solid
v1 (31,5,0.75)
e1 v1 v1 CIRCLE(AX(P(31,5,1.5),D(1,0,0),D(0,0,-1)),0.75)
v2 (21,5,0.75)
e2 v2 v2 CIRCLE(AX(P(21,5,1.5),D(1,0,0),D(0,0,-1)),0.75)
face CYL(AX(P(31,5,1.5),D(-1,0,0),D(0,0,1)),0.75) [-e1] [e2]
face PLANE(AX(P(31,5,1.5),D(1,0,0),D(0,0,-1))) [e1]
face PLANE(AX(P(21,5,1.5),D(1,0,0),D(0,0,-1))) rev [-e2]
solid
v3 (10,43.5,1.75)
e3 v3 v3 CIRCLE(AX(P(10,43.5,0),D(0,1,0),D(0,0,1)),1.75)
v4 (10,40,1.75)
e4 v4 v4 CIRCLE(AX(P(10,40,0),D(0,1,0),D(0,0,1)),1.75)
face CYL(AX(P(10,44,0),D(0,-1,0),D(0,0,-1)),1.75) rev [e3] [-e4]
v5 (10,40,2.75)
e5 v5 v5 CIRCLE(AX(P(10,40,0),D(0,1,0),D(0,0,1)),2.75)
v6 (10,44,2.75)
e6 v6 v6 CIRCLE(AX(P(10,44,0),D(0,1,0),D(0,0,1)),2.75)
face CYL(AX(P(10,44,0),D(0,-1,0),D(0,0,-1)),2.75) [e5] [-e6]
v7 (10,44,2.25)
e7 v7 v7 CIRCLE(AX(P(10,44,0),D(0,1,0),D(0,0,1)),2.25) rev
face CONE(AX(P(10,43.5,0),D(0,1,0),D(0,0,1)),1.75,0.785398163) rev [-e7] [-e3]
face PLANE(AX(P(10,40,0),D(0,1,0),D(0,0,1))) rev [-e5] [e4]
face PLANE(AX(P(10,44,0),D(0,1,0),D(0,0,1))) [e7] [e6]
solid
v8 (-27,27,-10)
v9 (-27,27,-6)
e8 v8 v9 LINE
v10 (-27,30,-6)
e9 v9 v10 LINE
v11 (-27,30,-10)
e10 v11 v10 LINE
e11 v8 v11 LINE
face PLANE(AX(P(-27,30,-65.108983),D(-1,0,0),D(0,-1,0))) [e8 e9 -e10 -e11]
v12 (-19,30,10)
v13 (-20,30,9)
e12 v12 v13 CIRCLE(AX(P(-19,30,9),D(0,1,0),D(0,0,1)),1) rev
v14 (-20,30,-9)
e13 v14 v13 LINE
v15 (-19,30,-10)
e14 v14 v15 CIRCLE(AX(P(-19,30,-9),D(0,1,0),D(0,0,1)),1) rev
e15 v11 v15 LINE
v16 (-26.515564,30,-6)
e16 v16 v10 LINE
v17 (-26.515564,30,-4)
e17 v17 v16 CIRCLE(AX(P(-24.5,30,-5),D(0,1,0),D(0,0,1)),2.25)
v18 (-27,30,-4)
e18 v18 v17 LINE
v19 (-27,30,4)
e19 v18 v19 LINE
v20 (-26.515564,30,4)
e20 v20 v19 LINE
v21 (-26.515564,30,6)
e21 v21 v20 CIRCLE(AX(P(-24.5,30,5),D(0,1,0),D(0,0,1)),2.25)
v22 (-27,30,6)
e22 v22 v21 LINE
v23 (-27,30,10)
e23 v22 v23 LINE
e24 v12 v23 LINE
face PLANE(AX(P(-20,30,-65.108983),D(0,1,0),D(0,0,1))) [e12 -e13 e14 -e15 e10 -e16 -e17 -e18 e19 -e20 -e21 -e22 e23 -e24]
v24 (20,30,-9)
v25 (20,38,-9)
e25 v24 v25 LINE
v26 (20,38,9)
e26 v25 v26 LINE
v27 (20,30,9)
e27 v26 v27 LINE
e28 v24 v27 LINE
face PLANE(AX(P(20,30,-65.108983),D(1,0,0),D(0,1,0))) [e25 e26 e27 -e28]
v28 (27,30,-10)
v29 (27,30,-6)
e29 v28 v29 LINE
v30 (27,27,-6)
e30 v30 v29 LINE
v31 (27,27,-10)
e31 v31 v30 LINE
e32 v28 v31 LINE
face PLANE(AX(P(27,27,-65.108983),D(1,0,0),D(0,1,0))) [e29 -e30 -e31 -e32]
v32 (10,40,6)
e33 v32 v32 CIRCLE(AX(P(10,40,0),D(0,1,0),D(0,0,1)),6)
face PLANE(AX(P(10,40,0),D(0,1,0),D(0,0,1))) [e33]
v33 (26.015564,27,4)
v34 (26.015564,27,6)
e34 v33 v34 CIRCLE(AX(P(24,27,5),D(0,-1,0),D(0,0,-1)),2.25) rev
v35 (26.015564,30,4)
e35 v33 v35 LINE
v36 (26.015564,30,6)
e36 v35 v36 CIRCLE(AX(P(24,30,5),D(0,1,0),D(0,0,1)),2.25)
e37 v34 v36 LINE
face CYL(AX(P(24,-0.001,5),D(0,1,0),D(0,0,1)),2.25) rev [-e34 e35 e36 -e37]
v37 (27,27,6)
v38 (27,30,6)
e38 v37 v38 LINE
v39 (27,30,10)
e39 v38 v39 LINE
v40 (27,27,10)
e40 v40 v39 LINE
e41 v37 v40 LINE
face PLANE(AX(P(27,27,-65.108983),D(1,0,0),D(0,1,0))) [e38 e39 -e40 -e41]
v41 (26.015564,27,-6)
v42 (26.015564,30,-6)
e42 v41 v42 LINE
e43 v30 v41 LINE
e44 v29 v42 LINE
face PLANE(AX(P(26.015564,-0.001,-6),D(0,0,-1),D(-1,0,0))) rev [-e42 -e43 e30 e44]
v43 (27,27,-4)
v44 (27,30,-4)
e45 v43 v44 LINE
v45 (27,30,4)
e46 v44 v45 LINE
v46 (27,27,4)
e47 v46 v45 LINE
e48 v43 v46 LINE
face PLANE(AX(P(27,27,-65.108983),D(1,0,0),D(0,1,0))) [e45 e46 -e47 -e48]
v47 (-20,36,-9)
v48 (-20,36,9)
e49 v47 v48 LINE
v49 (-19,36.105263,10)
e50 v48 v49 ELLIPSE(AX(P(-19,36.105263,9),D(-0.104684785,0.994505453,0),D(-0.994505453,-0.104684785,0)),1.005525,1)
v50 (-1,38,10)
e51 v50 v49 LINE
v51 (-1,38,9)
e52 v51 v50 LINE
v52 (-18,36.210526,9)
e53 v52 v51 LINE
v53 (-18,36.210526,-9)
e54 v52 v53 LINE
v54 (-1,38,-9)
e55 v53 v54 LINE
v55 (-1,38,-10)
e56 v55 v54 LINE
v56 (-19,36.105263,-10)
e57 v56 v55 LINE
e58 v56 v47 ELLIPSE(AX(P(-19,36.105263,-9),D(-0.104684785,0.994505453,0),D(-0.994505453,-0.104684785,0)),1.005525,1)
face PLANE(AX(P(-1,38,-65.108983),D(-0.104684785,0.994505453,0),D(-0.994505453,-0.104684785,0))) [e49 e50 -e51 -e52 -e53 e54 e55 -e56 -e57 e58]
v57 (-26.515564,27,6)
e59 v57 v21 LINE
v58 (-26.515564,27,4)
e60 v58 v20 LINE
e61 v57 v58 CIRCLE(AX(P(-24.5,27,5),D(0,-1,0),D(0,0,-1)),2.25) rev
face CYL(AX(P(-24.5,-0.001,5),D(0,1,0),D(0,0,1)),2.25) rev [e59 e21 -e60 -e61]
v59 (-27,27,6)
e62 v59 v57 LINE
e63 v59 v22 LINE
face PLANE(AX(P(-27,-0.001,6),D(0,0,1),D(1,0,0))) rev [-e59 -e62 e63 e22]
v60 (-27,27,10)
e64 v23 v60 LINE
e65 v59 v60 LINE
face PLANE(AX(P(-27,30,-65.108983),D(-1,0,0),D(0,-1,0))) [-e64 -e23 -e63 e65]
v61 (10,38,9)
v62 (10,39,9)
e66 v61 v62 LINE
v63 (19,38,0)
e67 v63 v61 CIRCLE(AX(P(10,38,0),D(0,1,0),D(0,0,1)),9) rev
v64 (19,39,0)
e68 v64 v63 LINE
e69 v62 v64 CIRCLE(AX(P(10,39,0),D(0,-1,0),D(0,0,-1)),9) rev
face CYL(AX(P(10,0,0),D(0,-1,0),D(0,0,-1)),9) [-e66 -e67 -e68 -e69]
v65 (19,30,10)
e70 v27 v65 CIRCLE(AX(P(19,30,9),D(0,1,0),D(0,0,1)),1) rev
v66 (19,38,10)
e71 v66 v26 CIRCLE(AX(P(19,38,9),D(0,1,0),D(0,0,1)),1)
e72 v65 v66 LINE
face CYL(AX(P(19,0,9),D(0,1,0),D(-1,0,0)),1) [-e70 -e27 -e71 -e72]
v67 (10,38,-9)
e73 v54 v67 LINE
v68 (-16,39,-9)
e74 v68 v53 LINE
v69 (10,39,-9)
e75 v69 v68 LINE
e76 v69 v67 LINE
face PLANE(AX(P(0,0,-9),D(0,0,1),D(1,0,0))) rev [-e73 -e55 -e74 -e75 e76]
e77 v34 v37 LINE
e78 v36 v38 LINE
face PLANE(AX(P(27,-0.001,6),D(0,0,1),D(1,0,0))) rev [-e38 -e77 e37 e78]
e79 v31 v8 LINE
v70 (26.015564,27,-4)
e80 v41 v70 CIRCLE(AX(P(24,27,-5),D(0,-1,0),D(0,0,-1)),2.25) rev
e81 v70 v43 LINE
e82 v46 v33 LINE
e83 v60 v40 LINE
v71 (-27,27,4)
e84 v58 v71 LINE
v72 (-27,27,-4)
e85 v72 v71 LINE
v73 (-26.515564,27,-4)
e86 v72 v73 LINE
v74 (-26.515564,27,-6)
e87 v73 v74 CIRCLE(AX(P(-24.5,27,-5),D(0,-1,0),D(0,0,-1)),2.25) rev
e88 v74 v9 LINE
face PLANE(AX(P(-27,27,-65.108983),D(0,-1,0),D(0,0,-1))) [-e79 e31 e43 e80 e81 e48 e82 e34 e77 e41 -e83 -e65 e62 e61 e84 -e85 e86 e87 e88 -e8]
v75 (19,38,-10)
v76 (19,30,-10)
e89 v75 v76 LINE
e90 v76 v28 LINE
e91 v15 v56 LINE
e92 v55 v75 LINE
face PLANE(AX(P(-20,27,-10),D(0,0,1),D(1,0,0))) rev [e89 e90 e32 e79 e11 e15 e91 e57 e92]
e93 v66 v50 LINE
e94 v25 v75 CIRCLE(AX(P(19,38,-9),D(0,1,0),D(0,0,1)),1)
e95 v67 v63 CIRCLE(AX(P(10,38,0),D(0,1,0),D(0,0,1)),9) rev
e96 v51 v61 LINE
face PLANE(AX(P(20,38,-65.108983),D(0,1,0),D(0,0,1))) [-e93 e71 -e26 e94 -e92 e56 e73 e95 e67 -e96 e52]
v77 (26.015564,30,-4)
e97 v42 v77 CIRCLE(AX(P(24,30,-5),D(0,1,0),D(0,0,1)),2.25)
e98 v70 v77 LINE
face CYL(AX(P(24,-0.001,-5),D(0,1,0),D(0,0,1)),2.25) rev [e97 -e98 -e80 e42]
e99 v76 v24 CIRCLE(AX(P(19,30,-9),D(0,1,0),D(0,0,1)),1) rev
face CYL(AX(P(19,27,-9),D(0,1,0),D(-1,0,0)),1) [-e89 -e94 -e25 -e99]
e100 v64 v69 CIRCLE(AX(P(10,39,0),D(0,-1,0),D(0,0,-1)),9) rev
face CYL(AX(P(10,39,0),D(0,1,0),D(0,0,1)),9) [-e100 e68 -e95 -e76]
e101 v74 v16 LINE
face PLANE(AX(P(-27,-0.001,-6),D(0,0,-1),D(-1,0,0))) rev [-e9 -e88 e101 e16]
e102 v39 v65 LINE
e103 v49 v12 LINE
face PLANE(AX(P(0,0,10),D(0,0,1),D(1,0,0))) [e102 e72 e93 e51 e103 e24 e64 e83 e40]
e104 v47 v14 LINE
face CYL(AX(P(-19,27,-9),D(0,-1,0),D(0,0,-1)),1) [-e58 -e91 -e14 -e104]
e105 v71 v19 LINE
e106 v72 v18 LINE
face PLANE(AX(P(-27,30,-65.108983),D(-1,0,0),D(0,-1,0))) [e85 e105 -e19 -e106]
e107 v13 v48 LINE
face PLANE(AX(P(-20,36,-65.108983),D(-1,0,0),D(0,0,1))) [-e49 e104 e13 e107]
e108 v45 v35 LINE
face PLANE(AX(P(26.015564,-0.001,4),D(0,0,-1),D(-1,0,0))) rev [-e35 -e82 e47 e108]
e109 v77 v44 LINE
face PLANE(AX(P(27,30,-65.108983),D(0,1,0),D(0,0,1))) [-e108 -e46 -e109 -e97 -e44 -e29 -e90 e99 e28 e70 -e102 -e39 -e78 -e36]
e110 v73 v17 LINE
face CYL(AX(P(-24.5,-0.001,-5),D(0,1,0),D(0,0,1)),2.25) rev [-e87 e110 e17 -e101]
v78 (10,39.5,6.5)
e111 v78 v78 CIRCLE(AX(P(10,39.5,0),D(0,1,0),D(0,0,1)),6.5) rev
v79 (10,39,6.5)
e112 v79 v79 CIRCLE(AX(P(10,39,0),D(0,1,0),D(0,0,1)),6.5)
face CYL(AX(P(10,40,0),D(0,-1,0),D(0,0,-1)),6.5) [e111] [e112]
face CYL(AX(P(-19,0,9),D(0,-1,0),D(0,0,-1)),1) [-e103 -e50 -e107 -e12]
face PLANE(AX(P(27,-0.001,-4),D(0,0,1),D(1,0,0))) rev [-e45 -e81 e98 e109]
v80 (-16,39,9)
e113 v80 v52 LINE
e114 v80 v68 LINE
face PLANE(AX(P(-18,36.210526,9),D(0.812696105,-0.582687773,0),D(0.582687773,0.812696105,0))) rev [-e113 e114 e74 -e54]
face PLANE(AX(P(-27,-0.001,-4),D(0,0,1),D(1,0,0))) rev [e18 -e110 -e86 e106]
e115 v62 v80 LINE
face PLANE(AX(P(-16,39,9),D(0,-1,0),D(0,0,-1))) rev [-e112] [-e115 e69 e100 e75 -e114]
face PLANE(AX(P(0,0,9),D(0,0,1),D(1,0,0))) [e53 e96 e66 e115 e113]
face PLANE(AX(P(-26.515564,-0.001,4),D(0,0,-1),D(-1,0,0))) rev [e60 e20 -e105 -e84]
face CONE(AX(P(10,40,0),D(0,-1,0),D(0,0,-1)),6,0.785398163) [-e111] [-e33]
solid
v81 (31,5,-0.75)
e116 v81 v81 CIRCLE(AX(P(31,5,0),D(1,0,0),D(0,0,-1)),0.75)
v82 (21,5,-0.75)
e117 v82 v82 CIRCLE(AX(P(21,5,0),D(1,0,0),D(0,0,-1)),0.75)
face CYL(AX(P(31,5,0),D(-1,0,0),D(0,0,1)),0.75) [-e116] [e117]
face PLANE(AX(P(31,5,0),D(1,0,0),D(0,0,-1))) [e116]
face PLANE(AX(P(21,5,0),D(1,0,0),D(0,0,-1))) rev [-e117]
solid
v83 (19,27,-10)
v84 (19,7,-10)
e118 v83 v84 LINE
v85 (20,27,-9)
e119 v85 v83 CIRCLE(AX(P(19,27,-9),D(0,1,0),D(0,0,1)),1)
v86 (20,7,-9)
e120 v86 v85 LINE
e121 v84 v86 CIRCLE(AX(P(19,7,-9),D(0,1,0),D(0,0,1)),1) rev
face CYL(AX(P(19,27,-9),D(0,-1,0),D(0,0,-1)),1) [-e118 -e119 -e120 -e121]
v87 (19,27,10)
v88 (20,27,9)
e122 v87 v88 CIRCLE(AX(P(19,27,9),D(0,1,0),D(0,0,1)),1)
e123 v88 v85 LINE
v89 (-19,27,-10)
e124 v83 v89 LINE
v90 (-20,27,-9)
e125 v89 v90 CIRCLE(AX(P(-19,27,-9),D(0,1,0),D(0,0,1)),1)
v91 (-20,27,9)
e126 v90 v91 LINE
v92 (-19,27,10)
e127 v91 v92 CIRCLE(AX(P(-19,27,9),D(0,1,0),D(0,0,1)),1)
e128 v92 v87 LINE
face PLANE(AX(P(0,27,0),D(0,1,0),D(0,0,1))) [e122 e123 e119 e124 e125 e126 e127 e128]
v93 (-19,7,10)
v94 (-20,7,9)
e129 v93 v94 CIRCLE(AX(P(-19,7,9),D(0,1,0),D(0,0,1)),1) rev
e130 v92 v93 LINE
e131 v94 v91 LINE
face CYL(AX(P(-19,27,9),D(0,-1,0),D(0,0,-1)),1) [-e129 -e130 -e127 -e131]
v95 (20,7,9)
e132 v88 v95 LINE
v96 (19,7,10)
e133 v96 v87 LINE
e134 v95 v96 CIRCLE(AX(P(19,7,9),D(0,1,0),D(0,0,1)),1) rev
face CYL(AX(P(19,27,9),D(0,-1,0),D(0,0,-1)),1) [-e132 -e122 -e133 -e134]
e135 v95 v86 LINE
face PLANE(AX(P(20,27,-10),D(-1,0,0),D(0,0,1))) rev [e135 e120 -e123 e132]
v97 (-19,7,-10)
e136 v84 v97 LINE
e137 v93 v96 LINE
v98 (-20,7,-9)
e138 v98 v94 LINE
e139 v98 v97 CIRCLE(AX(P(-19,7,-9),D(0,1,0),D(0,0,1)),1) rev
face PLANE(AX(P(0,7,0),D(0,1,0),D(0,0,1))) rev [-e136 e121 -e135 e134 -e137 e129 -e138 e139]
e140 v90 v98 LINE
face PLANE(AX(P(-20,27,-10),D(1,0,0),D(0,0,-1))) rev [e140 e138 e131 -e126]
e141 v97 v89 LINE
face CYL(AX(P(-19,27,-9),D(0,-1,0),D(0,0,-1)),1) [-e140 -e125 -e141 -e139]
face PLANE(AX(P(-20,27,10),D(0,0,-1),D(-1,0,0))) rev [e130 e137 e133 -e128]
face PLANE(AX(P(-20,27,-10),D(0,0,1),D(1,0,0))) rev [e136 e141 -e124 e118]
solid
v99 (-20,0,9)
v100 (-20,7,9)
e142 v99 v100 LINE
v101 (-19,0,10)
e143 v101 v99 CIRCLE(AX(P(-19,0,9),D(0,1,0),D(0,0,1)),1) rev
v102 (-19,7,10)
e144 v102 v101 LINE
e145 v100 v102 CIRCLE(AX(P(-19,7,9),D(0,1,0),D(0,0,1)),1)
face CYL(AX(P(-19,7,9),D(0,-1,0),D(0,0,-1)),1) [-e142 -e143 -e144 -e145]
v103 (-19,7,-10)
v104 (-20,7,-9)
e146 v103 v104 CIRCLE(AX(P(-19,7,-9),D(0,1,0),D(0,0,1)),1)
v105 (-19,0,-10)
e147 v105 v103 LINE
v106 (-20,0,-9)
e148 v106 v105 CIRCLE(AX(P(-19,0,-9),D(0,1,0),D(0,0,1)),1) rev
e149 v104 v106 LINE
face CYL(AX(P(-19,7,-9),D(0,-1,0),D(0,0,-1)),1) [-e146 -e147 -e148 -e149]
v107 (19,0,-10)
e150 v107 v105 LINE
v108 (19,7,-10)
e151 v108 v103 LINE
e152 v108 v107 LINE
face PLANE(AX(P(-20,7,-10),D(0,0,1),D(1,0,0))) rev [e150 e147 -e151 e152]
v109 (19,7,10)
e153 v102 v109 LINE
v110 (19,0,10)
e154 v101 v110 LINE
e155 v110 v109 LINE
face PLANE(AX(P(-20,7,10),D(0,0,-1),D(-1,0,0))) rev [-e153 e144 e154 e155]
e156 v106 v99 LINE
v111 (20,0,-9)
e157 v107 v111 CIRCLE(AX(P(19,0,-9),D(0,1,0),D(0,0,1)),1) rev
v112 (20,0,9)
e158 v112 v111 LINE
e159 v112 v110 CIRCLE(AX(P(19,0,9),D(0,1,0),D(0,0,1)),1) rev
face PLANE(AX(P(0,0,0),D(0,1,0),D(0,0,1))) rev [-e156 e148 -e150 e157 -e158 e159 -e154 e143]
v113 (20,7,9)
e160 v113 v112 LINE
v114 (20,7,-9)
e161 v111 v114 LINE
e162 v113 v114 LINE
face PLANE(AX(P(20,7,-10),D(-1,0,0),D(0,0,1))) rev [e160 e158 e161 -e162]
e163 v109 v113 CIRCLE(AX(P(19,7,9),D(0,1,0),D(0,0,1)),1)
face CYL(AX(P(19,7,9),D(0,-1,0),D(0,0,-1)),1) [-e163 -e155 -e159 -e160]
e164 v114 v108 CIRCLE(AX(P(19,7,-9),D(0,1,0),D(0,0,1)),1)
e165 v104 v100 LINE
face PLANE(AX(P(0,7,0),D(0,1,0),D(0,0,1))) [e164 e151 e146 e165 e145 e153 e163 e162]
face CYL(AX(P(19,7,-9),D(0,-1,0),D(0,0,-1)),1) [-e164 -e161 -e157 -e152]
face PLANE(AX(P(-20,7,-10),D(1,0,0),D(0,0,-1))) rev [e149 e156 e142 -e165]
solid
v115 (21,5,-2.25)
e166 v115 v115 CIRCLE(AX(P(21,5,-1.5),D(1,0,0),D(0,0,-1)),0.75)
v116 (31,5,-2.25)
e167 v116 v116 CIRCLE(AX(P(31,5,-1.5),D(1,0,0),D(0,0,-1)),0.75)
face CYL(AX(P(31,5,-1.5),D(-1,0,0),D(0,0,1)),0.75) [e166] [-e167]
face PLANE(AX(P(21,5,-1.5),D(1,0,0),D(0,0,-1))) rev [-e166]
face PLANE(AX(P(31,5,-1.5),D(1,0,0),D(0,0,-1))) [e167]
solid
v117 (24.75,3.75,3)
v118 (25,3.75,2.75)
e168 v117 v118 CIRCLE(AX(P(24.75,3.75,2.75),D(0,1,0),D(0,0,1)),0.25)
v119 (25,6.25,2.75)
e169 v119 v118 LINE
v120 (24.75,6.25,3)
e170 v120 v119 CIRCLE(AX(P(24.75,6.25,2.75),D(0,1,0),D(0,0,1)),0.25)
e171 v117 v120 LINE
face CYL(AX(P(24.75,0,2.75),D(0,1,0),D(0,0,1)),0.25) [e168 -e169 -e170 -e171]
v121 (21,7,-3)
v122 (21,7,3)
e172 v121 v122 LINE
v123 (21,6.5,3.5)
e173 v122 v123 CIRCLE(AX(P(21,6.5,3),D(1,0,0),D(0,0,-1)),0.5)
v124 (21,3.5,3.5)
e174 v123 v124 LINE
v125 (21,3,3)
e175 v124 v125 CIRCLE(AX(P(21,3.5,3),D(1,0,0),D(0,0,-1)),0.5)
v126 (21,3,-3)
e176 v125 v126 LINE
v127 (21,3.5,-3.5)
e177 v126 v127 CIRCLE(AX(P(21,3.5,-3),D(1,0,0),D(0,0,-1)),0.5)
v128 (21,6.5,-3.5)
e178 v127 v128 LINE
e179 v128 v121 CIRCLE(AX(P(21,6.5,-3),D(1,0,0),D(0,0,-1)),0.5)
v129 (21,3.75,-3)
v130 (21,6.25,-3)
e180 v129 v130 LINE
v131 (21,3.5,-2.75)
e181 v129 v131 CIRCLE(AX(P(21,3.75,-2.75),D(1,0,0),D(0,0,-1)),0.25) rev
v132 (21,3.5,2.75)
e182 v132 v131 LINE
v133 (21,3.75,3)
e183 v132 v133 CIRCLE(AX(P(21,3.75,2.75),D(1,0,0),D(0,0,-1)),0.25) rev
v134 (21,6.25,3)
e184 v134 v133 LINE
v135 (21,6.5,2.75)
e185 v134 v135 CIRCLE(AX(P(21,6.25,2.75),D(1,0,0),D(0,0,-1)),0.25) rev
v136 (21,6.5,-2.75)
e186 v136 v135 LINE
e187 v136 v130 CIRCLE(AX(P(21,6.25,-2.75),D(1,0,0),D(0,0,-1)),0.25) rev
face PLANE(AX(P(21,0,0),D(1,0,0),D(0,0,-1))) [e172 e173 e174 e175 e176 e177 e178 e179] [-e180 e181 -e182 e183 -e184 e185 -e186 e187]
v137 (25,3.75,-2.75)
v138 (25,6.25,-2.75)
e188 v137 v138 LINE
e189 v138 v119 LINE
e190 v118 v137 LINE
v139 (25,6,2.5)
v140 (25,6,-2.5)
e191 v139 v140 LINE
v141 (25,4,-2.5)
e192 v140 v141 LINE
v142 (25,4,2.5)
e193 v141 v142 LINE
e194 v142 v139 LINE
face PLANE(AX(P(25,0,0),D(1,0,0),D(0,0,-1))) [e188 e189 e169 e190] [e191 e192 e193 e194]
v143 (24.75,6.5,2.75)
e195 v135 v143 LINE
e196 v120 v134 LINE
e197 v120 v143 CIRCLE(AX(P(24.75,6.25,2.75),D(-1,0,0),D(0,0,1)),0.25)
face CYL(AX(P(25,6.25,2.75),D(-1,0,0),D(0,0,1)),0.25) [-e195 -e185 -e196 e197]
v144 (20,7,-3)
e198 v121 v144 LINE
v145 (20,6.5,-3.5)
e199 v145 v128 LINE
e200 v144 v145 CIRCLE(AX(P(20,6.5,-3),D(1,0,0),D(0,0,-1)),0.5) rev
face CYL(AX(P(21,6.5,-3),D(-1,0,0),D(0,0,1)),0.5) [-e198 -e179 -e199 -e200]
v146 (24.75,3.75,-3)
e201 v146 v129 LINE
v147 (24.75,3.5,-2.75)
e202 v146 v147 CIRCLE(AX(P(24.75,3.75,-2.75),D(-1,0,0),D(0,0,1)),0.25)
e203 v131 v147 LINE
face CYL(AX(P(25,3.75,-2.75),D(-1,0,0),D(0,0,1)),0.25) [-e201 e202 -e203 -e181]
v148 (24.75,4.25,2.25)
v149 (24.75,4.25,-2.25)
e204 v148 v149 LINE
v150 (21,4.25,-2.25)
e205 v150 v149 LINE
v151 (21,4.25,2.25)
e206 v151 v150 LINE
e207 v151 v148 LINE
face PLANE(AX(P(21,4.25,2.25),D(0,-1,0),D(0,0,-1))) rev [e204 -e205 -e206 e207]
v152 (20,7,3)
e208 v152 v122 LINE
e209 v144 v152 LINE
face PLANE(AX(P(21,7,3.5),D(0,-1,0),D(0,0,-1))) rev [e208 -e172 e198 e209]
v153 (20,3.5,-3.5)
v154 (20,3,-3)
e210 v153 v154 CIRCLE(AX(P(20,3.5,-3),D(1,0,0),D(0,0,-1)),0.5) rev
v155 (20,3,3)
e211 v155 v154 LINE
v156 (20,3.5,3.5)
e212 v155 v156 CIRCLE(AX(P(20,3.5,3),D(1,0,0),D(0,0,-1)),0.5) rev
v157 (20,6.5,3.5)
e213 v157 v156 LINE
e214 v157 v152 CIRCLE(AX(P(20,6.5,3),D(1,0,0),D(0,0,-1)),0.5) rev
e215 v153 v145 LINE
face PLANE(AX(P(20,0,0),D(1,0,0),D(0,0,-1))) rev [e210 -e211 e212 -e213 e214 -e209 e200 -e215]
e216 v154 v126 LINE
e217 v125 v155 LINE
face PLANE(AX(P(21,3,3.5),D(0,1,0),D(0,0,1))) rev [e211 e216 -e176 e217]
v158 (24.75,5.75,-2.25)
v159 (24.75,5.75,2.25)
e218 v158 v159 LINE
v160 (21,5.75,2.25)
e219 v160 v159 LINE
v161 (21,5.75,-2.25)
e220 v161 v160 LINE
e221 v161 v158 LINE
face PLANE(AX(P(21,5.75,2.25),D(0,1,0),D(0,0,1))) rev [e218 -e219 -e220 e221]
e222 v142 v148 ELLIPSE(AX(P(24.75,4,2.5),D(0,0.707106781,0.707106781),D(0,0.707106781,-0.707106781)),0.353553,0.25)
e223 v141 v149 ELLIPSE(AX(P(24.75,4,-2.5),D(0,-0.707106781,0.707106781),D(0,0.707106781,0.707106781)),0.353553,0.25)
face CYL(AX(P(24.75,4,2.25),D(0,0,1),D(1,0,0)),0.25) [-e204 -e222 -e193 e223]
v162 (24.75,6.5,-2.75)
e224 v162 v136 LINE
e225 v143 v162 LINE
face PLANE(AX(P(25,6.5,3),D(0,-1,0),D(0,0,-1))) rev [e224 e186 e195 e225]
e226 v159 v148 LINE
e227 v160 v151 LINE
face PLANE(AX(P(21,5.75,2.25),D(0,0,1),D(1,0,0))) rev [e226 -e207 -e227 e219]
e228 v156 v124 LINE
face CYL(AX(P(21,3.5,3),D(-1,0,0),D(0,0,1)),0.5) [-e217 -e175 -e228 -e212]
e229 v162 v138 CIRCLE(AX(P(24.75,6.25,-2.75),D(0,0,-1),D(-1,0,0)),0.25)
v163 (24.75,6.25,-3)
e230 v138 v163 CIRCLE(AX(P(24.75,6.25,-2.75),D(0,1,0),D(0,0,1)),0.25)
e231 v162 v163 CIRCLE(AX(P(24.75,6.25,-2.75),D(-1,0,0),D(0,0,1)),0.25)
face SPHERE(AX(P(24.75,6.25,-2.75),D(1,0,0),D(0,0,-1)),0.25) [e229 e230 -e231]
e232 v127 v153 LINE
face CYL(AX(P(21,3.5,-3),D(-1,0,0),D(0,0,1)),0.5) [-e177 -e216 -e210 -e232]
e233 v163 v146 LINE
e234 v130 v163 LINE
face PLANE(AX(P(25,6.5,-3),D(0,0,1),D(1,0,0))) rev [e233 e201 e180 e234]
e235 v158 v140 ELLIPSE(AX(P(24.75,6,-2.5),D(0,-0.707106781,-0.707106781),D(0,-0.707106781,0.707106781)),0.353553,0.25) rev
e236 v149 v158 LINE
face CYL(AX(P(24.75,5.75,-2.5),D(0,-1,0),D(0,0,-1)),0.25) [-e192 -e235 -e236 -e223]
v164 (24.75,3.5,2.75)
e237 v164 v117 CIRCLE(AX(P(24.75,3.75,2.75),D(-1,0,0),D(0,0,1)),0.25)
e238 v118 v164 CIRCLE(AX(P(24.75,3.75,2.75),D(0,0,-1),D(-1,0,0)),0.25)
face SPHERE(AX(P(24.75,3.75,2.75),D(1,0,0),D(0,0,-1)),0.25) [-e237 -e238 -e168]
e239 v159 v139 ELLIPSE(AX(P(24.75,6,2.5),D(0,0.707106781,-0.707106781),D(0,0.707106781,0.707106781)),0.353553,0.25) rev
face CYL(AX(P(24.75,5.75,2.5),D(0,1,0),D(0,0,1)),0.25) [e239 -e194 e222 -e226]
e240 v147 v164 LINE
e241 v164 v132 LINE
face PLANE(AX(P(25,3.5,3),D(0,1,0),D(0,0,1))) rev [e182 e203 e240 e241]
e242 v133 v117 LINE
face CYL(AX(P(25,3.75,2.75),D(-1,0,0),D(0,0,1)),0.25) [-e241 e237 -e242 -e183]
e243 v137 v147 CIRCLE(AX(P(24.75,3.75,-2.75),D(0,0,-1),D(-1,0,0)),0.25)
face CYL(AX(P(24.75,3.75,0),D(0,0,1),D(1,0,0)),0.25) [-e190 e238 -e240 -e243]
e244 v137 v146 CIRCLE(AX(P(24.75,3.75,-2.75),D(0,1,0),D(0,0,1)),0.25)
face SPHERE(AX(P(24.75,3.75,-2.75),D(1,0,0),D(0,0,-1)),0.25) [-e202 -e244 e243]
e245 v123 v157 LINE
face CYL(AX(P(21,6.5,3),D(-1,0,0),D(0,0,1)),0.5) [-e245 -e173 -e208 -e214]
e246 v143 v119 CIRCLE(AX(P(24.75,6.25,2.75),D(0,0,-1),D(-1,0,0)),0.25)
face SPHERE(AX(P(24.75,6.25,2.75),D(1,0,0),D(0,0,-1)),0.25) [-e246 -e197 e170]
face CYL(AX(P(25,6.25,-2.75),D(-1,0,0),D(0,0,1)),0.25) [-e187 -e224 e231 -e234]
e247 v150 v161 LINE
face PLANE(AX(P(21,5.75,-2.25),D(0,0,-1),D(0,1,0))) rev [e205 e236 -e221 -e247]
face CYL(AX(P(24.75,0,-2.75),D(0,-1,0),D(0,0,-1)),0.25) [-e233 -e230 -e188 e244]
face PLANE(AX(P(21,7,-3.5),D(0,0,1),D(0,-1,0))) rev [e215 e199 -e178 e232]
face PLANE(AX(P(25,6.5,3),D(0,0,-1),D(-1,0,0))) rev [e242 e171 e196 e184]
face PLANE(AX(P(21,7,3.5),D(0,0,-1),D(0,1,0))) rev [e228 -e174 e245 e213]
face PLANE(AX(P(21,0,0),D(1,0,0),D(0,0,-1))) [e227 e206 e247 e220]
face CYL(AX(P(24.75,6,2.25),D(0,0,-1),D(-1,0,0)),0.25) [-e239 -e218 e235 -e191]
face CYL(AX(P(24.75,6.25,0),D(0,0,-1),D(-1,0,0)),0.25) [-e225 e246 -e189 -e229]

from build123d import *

# Parameters (mm, degrees)
SKETCH1_W            = 40
SKETCH1_H            = 20
BOSS_EXTRUDE1_DEPTH  = 7
SKETCH2_W            = 40
SKETCH2_H            = 20
BOSS_EXTRUDE2_DEPTH  = 20
BOSS_EXTRUDE3_DEPTH  = 20
BOSS_EXTRUDE4_DEPTH  = 9
SKETCH5_R            = 6.5
BOSS_EXTRUDE5_DEPTH  = 1
CHAMFER1_SIZE        = 0.5
FILLET1_R            = 9
FILLET2_R            = 1
FILLET3_R            = 1
FILLET4_R            = 1
CUT_EXTRUDE1_DEPTH   = 3
SKETCH7_R            = 2.75
SKETCH7_R_2          = 1.75
BOSS_EXTRUDE6_DEPTH  = 4
CHAMFER2_SIZE        = 0.5
SKETCH8_W            = 7
SKETCH8_H            = 4
BOSS_EXTRUDE7_DEPTH  = 1
SKETCH9_W            = 6
SKETCH9_H            = 3
BOSS_EXTRUDE8_DEPTH  = 4
SKETCH10_W           = 4.5
SKETCH10_H           = 1.5
CUT_EXTRUDE2_DEPTH   = 4
SKETCH11_R           = 0.75
BOSS_EXTRUDE9_DEPTH  = 10
SKETCH12_R           = 0.75
BOSS_EXTRUDE10_DEPTH = 10
SKETCH13_R           = 0.75
BOSS_EXTRUDE11_DEPTH = 10
FILLET5_R            = 0.5
FILLET6_R            = 0.25
FILLET7_R            = 0.25


with BuildPart() as part:
    # Sketch1 → Boss-Extrude1 (new body)
    with BuildSketch(Plane(origin=(0, 0, 0), x_dir=(1, 0, 0), z_dir=(0, 1, 0))):
        Rectangle(SKETCH1_W, SKETCH1_H)
    extrude(amount=BOSS_EXTRUDE1_DEPTH)

    # Fillet2
    fillet2_edges = [part.edges().sort_by_distance(p)[0] for p in [
        (-20, 3.5, -10),
        (20, 3.5, -10),
        (20, 3.5, 10),
        (-20, 3.5, 10),
    ]]
    fillet(fillet2_edges, radius=FILLET2_R)


with BuildPart() as body_2:
    # Sketch2 → Boss-Extrude2 (new body)
    with BuildSketch(Plane(origin=(0, 7, 0), x_dir=(1, 0, 0), z_dir=(0, 1, 0))):
        Rectangle(SKETCH2_W, SKETCH2_H)
    extrude(amount=BOSS_EXTRUDE2_DEPTH)

    # Fillet3
    fillet3_edges = [body_2.edges().sort_by_distance(p)[0] for p in [
        (-20, 17, -10),
        (20, 17, -10),
        (20, 17, 10),
        (-20, 17, 10),
    ]]
    fillet(fillet3_edges, radius=FILLET3_R)


with BuildPart() as body_3:
    # Sketch3 → Boss-Extrude3 (new body)
    with BuildSketch(Plane.XY.offset(10)):
        Polygon((-27, 27), (27, 27), (27, 30), (20, 30), (20, 38), (-1, 38), (-20, 36), (-20, 30), (-27, 30), align=None)
    extrude(amount=-BOSS_EXTRUDE3_DEPTH)

    # Sketch4 → Boss-Extrude4 (add, symmetric)
    with BuildSketch(Plane.XY):
        Polygon((-18, 36.210526316), (-16, 39), (19, 39), (19, 38), (-1, 38), align=None)
    extrude(amount=BOSS_EXTRUDE4_DEPTH, both=True)

    # Sketch5 → Boss-Extrude5 (add)
    with BuildSketch(Plane(origin=(0, 39, 0), x_dir=(1, 0, 0), z_dir=(0, 1, 0))):
        with Locations(Location((10, 0, 0), (0, 0, 270))):
            Circle(SKETCH5_R)
    extrude(amount=BOSS_EXTRUDE5_DEPTH)

    # Chamfer1
    chamfer1_edges = [body_3.edges().sort_by_distance(p)[0] for p in [
        (10, 40, -6.5),
    ]]
    chamfer(chamfer1_edges, length=CHAMFER1_SIZE)

    # Fillet1
    fillet1_edges = [body_3.edges().sort_by_distance(p)[0] for p in [
        (19, 38.5, -9),
        (19, 38.5, 9),
    ]]
    fillet(fillet1_edges, radius=FILLET1_R - 0.0001)  # a hair under: the kernel refuses the full size

    # Fillet4
    fillet4_edges = [body_3.edges().sort_by_distance(p)[0] for p in [
        (20, 34, 10),
        (20, 34, -10),
        (-20, 33, -10),
        (-20, 33, 10),
    ]]
    fillet(fillet4_edges, radius=FILLET4_R)

    # Sketch6 → Cut-Extrude1 (cut)
    with BuildSketch(Plane(origin=(0, 30, 0), x_dir=(1, 0, 0), z_dir=(0, 1, 0))):
        with BuildLine():
            Line((-27, 6), (-26.515564437, 6))
            ThreePointArc((-26.515564437, 6), (-22.25, 5), (-26.515564437, 4))
            Line((-26.515564437, 4), (-27, 4))
            Line((-27, 4), (-27, 6))
        make_face()
        with BuildLine():
            Line((-26.515564437, -4), (-27, -4))
            Line((-27, -4), (-27, -6))
            Line((-27, -6), (-26.515564437, -6))
            ThreePointArc((-26.515564437, -6), (-22.25, -5), (-26.515564437, -4))
        make_face()
        with BuildLine():
            Line((26.015564437, 6), (27, 6))
            Line((27, 6), (27, 4))
            Line((27, 4), (26.015564437, 4))
            ThreePointArc((26.015564437, 4), (21.75, 5), (26.015564437, 6))
        make_face()
        with BuildLine():
            Line((26.015564437, -4), (27, -4))
            Line((27, -4), (27, -6))
            Line((27, -6), (26.015564437, -6))
            ThreePointArc((26.015564437, -6), (21.75, -5), (26.015564437, -4))
        make_face()
    extrude(amount=-CUT_EXTRUDE1_DEPTH, mode=Mode.SUBTRACT)


with BuildPart() as body_4:
    # Sketch7 → Boss-Extrude6 (new body)
    with BuildSketch(Plane(origin=(0, 40, 0), x_dir=(1, 0, 0), z_dir=(0, 1, 0))):
        with Locations(Location((10, 0, 0), (0, 0, 270))):
            Circle(SKETCH7_R)
        with Locations(Location((10, 0, 0), (0, 0, 270))):
            Circle(SKETCH7_R_2, mode=Mode.SUBTRACT)
    extrude(amount=BOSS_EXTRUDE6_DEPTH)

    # Chamfer2
    chamfer2_edges = [body_4.edges().sort_by_distance(p)[0] for p in [
        (10, 44, -1.75),
    ]]
    chamfer(chamfer2_edges, length=CHAMFER2_SIZE)


with BuildPart() as body_5:
    # Sketch8 → Boss-Extrude7 (new body)
    with BuildSketch(Plane(origin=(20, 0, 0), x_dir=(0, 0, -1), z_dir=(1, 0, 0))):
        with Locations((0, 5)):
            Rectangle(SKETCH8_W, SKETCH8_H)
    extrude(amount=BOSS_EXTRUDE7_DEPTH)

    # Sketch9 → Boss-Extrude8 (add)
    with BuildSketch(Plane(origin=(21, 0, 0), x_dir=(0, 0, -1), z_dir=(1, 0, 0))):
        with Locations((0, 5)):
            Rectangle(SKETCH9_W, SKETCH9_H)
    extrude(amount=BOSS_EXTRUDE8_DEPTH)

    # Sketch10 → Cut-Extrude2 (cut)
    with BuildSketch(Plane(origin=(25, 0, 0), x_dir=(0, 0, -1), z_dir=(1, 0, 0))):
        with Locations((0, 5)):
            Rectangle(SKETCH10_W, SKETCH10_H)
    extrude(amount=-CUT_EXTRUDE2_DEPTH, mode=Mode.SUBTRACT)

    # Fillet5
    fillet5_edges = [body_5.edges().sort_by_distance(p)[0] for p in [
        (20.5, 7, 3.5),
        (20.5, 7, -3.5),
        (20.5, 3, -3.5),
        (20.5, 3, 3.5),
    ]]
    fillet(fillet5_edges, radius=FILLET5_R)

    # Fillet6
    fillet6_edges = [body_5.edges().sort_by_distance(p)[0] for p in [
        (23, 6.5, 3),
        (23, 3.5, 3),
        (23, 3.5, -3),
        (23, 6.5, -3),
    ]]
    fillet(fillet6_edges, radius=FILLET6_R)

    # Fillet7
    fillet7_edges = [body_5.edges().sort_by_distance(p)[0] for p in [
        (25, 5, 2.25),
        (25, 4.25, 0),
        (25, 5, -2.25),
        (25, 5.75, 0),
        (25, 5, 3),
        (25, 6.5, 0),
        (25, 3.5, 0),
        (25, 5, -3),
        (25, 3.573223305, 2.926776695),
        (25, 3.573223305, -2.926776695),
        (25, 6.426776695, -2.926776695),
        (25, 6.426776695, 2.926776695),
    ]]
    fillet(fillet7_edges, radius=FILLET7_R)


with BuildPart() as body_6:
    # Sketch11 → Boss-Extrude9 (new body)
    with BuildSketch(Plane(origin=(21, 0, 0), x_dir=(0, 0, -1), z_dir=(1, 0, 0))):
        with Locations((0, 5)):
            Circle(SKETCH11_R)
    extrude(amount=BOSS_EXTRUDE9_DEPTH)


with BuildPart() as body_7:
    # Sketch12 → Boss-Extrude10 (new body)
    with BuildSketch(Plane(origin=(21, 0, 0), x_dir=(0, 0, -1), z_dir=(1, 0, 0))):
        with Locations((1.5, 5)):
            Circle(SKETCH12_R)
    extrude(amount=BOSS_EXTRUDE10_DEPTH)


with BuildPart() as body_8:
    # Sketch13 → Boss-Extrude11 (new body)
    with BuildSketch(Plane(origin=(21, 0, 0), x_dir=(0, 0, -1), z_dir=(1, 0, 0))):
        with Locations((-1.5, 5)):
            Circle(SKETCH13_R)
    extrude(amount=BOSS_EXTRUDE11_DEPTH)


solid = Compound([part.part, body_2.part, body_3.part, body_4.part, body_5.part, body_6.part, body_7.part, body_8.part])
